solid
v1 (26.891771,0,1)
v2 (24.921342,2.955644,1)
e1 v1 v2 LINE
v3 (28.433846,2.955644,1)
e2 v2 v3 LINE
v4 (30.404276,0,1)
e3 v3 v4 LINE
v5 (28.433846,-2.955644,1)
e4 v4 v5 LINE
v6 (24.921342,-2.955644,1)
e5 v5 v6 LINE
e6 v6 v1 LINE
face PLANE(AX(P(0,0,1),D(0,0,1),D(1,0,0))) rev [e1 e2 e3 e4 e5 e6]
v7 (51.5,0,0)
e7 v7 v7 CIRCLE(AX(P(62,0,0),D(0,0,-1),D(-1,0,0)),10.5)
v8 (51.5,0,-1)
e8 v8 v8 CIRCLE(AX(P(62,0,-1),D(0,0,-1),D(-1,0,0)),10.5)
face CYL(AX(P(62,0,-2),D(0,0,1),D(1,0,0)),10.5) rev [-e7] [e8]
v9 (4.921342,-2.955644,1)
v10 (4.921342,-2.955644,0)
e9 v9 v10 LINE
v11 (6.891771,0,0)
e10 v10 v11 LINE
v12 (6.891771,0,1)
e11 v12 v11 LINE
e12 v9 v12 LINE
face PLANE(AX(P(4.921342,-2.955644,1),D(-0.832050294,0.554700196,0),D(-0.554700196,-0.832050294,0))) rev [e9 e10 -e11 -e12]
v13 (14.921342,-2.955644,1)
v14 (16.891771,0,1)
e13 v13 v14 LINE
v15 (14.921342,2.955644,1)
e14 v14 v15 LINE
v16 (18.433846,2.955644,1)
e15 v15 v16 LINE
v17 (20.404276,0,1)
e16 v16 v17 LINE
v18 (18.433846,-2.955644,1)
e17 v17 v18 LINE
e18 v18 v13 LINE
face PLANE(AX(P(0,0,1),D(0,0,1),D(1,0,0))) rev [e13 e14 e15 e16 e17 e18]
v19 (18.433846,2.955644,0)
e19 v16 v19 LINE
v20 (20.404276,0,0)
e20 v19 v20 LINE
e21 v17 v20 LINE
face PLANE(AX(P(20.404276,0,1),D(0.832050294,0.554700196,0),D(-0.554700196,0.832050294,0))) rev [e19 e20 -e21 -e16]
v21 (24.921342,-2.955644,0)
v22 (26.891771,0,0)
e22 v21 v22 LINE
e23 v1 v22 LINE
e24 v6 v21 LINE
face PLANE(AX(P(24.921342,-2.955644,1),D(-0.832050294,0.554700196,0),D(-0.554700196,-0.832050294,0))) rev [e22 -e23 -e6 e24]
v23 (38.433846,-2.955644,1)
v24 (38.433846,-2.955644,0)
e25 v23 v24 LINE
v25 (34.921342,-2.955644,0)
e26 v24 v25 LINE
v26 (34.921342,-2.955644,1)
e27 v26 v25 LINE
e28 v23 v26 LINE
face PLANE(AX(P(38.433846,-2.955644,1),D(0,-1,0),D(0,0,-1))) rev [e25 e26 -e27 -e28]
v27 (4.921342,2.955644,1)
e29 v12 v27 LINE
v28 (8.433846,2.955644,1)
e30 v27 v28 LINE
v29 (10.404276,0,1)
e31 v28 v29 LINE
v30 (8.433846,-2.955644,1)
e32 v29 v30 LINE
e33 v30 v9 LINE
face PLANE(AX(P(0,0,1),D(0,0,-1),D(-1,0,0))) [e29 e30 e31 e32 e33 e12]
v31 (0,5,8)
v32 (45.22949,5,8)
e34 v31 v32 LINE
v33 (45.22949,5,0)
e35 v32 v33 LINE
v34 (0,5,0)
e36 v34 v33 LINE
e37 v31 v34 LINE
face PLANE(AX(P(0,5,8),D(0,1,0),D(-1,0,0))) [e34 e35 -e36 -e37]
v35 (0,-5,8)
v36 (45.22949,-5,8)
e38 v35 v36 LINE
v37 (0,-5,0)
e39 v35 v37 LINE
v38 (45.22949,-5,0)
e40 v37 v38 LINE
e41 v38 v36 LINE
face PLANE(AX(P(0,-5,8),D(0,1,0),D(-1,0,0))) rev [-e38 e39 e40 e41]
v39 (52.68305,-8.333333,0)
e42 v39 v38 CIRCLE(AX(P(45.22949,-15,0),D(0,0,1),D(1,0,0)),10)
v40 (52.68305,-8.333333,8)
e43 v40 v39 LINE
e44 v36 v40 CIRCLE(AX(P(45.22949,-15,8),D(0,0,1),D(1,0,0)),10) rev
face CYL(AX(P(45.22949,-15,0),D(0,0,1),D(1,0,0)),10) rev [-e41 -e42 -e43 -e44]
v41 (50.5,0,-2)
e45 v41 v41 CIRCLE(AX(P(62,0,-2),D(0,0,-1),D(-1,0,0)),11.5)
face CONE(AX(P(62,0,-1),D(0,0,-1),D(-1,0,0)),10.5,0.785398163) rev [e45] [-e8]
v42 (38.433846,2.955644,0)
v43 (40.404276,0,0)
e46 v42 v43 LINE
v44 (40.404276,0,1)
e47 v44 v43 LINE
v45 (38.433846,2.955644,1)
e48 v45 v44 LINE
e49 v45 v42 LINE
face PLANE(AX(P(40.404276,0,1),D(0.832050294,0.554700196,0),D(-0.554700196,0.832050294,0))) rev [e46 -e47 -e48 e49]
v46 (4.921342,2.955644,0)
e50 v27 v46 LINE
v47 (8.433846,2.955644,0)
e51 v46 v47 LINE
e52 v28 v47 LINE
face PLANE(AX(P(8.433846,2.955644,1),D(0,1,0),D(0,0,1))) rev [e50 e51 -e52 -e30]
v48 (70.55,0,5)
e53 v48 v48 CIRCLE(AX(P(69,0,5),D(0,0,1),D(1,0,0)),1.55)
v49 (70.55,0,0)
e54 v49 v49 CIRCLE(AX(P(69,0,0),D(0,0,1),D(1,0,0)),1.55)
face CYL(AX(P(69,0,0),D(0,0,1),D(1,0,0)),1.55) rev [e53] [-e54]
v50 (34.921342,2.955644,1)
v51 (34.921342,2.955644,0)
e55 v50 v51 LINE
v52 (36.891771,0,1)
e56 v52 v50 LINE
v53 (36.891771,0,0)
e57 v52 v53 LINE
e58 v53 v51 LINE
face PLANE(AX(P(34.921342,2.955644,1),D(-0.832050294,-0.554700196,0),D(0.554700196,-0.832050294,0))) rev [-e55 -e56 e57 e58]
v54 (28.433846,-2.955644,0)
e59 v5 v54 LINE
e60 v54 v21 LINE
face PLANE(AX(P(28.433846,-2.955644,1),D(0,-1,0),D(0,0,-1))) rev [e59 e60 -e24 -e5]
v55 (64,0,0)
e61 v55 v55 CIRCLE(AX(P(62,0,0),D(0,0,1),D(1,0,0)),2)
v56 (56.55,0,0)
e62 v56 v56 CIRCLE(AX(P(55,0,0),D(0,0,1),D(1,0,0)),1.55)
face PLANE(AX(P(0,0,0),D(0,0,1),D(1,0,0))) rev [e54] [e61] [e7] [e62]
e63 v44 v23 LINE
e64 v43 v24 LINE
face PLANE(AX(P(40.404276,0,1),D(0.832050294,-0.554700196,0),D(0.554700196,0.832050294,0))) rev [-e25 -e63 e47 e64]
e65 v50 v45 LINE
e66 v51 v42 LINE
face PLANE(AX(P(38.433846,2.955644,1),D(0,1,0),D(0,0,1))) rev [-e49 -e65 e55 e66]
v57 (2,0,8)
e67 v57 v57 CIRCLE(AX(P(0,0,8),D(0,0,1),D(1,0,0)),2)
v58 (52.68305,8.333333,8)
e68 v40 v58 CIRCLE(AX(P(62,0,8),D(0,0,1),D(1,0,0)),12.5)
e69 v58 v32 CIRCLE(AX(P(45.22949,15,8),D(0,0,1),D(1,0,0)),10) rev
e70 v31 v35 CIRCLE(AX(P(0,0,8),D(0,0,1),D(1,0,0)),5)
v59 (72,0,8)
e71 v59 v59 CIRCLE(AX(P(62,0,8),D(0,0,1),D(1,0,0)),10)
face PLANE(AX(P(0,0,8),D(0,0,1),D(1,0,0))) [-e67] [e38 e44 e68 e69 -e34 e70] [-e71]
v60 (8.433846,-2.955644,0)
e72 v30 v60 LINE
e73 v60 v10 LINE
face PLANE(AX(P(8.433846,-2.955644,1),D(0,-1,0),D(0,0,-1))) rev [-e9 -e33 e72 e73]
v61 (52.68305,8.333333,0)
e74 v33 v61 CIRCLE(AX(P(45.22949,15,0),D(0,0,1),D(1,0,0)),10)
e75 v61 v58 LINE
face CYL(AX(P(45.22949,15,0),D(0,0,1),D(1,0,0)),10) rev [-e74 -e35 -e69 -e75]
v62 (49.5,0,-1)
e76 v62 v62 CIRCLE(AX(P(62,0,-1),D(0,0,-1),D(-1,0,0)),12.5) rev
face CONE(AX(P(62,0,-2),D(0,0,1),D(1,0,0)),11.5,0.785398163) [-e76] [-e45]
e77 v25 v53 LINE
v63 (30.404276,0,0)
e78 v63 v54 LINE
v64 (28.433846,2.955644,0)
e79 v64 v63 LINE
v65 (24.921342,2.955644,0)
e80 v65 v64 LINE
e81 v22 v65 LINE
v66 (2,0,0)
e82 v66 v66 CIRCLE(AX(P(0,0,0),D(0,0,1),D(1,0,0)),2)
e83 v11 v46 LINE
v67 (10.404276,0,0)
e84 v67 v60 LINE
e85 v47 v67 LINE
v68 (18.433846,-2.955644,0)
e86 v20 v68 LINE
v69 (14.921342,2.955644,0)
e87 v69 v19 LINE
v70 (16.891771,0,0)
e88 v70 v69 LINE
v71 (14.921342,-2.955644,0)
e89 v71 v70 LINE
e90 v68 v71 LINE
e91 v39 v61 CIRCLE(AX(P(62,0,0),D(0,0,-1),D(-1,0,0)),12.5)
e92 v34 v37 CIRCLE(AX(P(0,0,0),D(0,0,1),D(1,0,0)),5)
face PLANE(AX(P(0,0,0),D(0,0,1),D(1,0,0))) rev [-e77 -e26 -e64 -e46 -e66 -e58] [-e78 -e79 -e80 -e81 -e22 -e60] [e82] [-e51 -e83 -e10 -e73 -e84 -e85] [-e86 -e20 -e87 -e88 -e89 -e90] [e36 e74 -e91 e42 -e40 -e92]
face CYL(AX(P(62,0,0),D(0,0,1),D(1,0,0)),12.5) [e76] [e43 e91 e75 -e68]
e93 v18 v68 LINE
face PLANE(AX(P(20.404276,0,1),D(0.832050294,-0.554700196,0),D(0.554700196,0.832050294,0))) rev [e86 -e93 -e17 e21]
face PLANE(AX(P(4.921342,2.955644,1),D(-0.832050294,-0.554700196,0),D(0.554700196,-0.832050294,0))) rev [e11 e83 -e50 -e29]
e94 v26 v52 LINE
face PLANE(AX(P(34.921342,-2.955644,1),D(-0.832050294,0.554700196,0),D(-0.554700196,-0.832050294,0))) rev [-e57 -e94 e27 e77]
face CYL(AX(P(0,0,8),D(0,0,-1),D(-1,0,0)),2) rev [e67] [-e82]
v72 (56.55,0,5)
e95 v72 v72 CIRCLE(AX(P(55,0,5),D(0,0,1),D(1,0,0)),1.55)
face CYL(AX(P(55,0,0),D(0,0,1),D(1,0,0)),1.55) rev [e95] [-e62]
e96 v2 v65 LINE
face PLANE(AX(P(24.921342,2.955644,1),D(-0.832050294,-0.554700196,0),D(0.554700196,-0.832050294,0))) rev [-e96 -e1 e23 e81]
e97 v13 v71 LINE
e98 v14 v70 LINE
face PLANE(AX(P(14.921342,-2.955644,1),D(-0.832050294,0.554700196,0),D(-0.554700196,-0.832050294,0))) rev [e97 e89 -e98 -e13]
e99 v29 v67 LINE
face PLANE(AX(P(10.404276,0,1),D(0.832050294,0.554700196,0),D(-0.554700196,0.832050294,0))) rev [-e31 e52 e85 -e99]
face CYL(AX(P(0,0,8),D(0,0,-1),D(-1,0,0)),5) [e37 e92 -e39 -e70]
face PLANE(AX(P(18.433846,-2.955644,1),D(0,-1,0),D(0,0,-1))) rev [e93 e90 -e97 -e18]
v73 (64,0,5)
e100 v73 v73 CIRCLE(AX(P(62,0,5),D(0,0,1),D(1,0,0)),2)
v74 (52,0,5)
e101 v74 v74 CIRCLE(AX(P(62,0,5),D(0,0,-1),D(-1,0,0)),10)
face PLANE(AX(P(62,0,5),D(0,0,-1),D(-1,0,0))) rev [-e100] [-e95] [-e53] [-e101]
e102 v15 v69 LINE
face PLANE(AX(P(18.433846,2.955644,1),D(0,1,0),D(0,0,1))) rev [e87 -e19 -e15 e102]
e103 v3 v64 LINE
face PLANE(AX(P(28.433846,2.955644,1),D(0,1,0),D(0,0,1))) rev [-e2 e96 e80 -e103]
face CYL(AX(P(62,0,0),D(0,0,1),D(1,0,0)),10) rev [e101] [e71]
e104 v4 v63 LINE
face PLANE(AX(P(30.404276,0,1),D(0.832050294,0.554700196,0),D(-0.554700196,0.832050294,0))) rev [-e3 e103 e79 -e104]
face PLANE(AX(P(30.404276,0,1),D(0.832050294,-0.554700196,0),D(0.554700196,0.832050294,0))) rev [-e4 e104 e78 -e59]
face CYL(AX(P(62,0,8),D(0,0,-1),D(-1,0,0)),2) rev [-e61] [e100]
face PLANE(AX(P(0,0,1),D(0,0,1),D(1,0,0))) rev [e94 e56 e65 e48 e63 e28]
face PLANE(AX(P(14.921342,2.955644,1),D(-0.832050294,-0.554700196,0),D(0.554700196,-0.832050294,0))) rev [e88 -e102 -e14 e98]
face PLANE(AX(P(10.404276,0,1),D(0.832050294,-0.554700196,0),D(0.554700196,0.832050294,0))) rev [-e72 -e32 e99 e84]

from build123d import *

# Parameters (mm, degrees)
SKETCH_2_R          = 2
EXTRUDE_1_DEPTH     = 8
SKETCH_3_R          = 12.5
SKETCH_3_R_2        = 10
EXTRUDE_2_DEPTH     = 8
EXTRUDE_START       = -5
SKETCH_4_R          = 10
SKETCH_4_R_2        = 2.013264837
EXTRUDE_3_DEPTH     = 5
SKETCH_5_R          = 10
CUT_EXTRUDE_1_DEPTH = 3
FILLET_1_R          = 10
SKETCH_6_R          = 1.55
CUT_EXTRUDE_2_DEPTH = 76.706670776
SKETCH_7_R          = 12.5
SKETCH_7_R_2        = 10.5
EXTRUDE_4_DEPTH     = 2
CHAMFER_1_SIZE      = 1
CUT_EXTRUDE_3_DEPTH = 1


with BuildPart() as part:
    # 草图2 → 凸台-拉伸1 (new body)
    with BuildSketch(Plane.XY):
        with BuildLine():
            Line((0, -5), (62, -5))
            ThreePointArc((62, -5), (67, 0), (62, 5))
            Line((62, 5), (0, 5))
            ThreePointArc((0, 5), (-5, 0), (0, -5))
        make_face()
        Circle(SKETCH_2_R, mode=Mode.SUBTRACT)
        with Locations((62, 0)):
            Circle(SKETCH_2_R, mode=Mode.SUBTRACT)
    extrude(amount=EXTRUDE_1_DEPTH)

    # 草图3 → 凸台-拉伸2 (add)
    with BuildSketch(Plane.XY.offset(8)):
        with Locations((62, 0)):
            Circle(SKETCH_3_R)
        with Locations((62, 0)):
            Circle(SKETCH_3_R_2, mode=Mode.SUBTRACT)
    extrude(amount=-EXTRUDE_2_DEPTH)

    # 草图4 → 凸台-拉伸3 (add)
    with BuildSketch(Plane(origin=(0, 0, 0), x_dir=(-1, 0, 0), z_dir=(0, 0, -1)).offset(EXTRUDE_START)):
        with Locations((-62, 0)):
            Circle(SKETCH_4_R)
        with Locations((-62, 0)):
            Circle(SKETCH_4_R_2, mode=Mode.SUBTRACT)
    extrude(amount=EXTRUDE_3_DEPTH)

    # 草图5 → 切除-拉伸1 (cut)
    with BuildSketch(Plane.XY.offset(8)):
        with Locations((62, 0)):
            Circle(SKETCH_5_R)
    extrude(amount=-CUT_EXTRUDE_1_DEPTH, mode=Mode.SUBTRACT)

    # 圆角1
    fillet_1_edges = [part.edges().sort_by_distance(p)[0] for p in [
        (50.543560763, 5, 4),
        (50.543560763, -5, 4),
    ]]
    fillet(fillet_1_edges, radius=FILLET_1_R)

    # 草图6 → 切除-拉伸2 (cut, through all)
    with BuildSketch(Plane.XY.offset(5)):
        with Locations((55, 0)):
            Circle(SKETCH_6_R)
        with Locations((69, 0)):
            Circle(SKETCH_6_R)
    extrude(amount=-CUT_EXTRUDE_2_DEPTH, mode=Mode.SUBTRACT)

    # 草图7 → 凸台-拉伸4 (add)
    with BuildSketch(Plane(origin=(0, 0, 0), x_dir=(-1, 0, 0), z_dir=(0, 0, -1))):
        with Locations(Location((-62, 0, 0), (0, 0, 318.189685104))):
            Circle(SKETCH_7_R)
        with Locations((-62, 0)):
            Circle(SKETCH_7_R_2, mode=Mode.SUBTRACT)
    extrude(amount=EXTRUDE_4_DEPTH)

    # 倒角1
    chamfer_1_edges = [part.edges().sort_by_distance(p)[0] for p in [
        (71.316949906, 8.333333333, -2),
        (72.5, 0, -2),
    ]]
    chamfer(chamfer_1_edges, length=CHAMFER_1_SIZE - 0.0001)  # a hair under: the kernel refuses the full size

    # 草图8 → 切除-拉伸3 (cut)
    with BuildSketch(Plane(origin=(0, 0, 0), x_dir=(-1, 0, 0), z_dir=(0, 0, -1))):
        Polygon((-40.404275713, 0), (-38.433846298, 2.955644123), (-34.921341688, 2.955644123), (-36.891771103, 0), (-34.921341688, -2.955644123), (-38.433846298, -2.955644123), align=None)
        Polygon((-30.404275713, 0), (-28.433846298, 2.955644123), (-24.921341688, 2.955644123), (-26.891771103, 0), (-24.921341688, -2.955644123), (-28.433846298, -2.955644123), align=None)
        Polygon((-20.404275713, 0), (-18.433846298, 2.955644123), (-14.921341688, 2.955644123), (-16.891771103, 0), (-14.921341688, -2.955644123), (-18.433846298, -2.955644123), align=None)
        Polygon((-10.404275713, 0), (-8.433846298, 2.955644123), (-4.921341688, 2.955644123), (-6.891771103, 0), (-4.921341688, -2.955644123), (-8.433846298, -2.955644123), align=None)
    extrude(amount=-CUT_EXTRUDE_3_DEPTH, mode=Mode.SUBTRACT)


solid = part.part
